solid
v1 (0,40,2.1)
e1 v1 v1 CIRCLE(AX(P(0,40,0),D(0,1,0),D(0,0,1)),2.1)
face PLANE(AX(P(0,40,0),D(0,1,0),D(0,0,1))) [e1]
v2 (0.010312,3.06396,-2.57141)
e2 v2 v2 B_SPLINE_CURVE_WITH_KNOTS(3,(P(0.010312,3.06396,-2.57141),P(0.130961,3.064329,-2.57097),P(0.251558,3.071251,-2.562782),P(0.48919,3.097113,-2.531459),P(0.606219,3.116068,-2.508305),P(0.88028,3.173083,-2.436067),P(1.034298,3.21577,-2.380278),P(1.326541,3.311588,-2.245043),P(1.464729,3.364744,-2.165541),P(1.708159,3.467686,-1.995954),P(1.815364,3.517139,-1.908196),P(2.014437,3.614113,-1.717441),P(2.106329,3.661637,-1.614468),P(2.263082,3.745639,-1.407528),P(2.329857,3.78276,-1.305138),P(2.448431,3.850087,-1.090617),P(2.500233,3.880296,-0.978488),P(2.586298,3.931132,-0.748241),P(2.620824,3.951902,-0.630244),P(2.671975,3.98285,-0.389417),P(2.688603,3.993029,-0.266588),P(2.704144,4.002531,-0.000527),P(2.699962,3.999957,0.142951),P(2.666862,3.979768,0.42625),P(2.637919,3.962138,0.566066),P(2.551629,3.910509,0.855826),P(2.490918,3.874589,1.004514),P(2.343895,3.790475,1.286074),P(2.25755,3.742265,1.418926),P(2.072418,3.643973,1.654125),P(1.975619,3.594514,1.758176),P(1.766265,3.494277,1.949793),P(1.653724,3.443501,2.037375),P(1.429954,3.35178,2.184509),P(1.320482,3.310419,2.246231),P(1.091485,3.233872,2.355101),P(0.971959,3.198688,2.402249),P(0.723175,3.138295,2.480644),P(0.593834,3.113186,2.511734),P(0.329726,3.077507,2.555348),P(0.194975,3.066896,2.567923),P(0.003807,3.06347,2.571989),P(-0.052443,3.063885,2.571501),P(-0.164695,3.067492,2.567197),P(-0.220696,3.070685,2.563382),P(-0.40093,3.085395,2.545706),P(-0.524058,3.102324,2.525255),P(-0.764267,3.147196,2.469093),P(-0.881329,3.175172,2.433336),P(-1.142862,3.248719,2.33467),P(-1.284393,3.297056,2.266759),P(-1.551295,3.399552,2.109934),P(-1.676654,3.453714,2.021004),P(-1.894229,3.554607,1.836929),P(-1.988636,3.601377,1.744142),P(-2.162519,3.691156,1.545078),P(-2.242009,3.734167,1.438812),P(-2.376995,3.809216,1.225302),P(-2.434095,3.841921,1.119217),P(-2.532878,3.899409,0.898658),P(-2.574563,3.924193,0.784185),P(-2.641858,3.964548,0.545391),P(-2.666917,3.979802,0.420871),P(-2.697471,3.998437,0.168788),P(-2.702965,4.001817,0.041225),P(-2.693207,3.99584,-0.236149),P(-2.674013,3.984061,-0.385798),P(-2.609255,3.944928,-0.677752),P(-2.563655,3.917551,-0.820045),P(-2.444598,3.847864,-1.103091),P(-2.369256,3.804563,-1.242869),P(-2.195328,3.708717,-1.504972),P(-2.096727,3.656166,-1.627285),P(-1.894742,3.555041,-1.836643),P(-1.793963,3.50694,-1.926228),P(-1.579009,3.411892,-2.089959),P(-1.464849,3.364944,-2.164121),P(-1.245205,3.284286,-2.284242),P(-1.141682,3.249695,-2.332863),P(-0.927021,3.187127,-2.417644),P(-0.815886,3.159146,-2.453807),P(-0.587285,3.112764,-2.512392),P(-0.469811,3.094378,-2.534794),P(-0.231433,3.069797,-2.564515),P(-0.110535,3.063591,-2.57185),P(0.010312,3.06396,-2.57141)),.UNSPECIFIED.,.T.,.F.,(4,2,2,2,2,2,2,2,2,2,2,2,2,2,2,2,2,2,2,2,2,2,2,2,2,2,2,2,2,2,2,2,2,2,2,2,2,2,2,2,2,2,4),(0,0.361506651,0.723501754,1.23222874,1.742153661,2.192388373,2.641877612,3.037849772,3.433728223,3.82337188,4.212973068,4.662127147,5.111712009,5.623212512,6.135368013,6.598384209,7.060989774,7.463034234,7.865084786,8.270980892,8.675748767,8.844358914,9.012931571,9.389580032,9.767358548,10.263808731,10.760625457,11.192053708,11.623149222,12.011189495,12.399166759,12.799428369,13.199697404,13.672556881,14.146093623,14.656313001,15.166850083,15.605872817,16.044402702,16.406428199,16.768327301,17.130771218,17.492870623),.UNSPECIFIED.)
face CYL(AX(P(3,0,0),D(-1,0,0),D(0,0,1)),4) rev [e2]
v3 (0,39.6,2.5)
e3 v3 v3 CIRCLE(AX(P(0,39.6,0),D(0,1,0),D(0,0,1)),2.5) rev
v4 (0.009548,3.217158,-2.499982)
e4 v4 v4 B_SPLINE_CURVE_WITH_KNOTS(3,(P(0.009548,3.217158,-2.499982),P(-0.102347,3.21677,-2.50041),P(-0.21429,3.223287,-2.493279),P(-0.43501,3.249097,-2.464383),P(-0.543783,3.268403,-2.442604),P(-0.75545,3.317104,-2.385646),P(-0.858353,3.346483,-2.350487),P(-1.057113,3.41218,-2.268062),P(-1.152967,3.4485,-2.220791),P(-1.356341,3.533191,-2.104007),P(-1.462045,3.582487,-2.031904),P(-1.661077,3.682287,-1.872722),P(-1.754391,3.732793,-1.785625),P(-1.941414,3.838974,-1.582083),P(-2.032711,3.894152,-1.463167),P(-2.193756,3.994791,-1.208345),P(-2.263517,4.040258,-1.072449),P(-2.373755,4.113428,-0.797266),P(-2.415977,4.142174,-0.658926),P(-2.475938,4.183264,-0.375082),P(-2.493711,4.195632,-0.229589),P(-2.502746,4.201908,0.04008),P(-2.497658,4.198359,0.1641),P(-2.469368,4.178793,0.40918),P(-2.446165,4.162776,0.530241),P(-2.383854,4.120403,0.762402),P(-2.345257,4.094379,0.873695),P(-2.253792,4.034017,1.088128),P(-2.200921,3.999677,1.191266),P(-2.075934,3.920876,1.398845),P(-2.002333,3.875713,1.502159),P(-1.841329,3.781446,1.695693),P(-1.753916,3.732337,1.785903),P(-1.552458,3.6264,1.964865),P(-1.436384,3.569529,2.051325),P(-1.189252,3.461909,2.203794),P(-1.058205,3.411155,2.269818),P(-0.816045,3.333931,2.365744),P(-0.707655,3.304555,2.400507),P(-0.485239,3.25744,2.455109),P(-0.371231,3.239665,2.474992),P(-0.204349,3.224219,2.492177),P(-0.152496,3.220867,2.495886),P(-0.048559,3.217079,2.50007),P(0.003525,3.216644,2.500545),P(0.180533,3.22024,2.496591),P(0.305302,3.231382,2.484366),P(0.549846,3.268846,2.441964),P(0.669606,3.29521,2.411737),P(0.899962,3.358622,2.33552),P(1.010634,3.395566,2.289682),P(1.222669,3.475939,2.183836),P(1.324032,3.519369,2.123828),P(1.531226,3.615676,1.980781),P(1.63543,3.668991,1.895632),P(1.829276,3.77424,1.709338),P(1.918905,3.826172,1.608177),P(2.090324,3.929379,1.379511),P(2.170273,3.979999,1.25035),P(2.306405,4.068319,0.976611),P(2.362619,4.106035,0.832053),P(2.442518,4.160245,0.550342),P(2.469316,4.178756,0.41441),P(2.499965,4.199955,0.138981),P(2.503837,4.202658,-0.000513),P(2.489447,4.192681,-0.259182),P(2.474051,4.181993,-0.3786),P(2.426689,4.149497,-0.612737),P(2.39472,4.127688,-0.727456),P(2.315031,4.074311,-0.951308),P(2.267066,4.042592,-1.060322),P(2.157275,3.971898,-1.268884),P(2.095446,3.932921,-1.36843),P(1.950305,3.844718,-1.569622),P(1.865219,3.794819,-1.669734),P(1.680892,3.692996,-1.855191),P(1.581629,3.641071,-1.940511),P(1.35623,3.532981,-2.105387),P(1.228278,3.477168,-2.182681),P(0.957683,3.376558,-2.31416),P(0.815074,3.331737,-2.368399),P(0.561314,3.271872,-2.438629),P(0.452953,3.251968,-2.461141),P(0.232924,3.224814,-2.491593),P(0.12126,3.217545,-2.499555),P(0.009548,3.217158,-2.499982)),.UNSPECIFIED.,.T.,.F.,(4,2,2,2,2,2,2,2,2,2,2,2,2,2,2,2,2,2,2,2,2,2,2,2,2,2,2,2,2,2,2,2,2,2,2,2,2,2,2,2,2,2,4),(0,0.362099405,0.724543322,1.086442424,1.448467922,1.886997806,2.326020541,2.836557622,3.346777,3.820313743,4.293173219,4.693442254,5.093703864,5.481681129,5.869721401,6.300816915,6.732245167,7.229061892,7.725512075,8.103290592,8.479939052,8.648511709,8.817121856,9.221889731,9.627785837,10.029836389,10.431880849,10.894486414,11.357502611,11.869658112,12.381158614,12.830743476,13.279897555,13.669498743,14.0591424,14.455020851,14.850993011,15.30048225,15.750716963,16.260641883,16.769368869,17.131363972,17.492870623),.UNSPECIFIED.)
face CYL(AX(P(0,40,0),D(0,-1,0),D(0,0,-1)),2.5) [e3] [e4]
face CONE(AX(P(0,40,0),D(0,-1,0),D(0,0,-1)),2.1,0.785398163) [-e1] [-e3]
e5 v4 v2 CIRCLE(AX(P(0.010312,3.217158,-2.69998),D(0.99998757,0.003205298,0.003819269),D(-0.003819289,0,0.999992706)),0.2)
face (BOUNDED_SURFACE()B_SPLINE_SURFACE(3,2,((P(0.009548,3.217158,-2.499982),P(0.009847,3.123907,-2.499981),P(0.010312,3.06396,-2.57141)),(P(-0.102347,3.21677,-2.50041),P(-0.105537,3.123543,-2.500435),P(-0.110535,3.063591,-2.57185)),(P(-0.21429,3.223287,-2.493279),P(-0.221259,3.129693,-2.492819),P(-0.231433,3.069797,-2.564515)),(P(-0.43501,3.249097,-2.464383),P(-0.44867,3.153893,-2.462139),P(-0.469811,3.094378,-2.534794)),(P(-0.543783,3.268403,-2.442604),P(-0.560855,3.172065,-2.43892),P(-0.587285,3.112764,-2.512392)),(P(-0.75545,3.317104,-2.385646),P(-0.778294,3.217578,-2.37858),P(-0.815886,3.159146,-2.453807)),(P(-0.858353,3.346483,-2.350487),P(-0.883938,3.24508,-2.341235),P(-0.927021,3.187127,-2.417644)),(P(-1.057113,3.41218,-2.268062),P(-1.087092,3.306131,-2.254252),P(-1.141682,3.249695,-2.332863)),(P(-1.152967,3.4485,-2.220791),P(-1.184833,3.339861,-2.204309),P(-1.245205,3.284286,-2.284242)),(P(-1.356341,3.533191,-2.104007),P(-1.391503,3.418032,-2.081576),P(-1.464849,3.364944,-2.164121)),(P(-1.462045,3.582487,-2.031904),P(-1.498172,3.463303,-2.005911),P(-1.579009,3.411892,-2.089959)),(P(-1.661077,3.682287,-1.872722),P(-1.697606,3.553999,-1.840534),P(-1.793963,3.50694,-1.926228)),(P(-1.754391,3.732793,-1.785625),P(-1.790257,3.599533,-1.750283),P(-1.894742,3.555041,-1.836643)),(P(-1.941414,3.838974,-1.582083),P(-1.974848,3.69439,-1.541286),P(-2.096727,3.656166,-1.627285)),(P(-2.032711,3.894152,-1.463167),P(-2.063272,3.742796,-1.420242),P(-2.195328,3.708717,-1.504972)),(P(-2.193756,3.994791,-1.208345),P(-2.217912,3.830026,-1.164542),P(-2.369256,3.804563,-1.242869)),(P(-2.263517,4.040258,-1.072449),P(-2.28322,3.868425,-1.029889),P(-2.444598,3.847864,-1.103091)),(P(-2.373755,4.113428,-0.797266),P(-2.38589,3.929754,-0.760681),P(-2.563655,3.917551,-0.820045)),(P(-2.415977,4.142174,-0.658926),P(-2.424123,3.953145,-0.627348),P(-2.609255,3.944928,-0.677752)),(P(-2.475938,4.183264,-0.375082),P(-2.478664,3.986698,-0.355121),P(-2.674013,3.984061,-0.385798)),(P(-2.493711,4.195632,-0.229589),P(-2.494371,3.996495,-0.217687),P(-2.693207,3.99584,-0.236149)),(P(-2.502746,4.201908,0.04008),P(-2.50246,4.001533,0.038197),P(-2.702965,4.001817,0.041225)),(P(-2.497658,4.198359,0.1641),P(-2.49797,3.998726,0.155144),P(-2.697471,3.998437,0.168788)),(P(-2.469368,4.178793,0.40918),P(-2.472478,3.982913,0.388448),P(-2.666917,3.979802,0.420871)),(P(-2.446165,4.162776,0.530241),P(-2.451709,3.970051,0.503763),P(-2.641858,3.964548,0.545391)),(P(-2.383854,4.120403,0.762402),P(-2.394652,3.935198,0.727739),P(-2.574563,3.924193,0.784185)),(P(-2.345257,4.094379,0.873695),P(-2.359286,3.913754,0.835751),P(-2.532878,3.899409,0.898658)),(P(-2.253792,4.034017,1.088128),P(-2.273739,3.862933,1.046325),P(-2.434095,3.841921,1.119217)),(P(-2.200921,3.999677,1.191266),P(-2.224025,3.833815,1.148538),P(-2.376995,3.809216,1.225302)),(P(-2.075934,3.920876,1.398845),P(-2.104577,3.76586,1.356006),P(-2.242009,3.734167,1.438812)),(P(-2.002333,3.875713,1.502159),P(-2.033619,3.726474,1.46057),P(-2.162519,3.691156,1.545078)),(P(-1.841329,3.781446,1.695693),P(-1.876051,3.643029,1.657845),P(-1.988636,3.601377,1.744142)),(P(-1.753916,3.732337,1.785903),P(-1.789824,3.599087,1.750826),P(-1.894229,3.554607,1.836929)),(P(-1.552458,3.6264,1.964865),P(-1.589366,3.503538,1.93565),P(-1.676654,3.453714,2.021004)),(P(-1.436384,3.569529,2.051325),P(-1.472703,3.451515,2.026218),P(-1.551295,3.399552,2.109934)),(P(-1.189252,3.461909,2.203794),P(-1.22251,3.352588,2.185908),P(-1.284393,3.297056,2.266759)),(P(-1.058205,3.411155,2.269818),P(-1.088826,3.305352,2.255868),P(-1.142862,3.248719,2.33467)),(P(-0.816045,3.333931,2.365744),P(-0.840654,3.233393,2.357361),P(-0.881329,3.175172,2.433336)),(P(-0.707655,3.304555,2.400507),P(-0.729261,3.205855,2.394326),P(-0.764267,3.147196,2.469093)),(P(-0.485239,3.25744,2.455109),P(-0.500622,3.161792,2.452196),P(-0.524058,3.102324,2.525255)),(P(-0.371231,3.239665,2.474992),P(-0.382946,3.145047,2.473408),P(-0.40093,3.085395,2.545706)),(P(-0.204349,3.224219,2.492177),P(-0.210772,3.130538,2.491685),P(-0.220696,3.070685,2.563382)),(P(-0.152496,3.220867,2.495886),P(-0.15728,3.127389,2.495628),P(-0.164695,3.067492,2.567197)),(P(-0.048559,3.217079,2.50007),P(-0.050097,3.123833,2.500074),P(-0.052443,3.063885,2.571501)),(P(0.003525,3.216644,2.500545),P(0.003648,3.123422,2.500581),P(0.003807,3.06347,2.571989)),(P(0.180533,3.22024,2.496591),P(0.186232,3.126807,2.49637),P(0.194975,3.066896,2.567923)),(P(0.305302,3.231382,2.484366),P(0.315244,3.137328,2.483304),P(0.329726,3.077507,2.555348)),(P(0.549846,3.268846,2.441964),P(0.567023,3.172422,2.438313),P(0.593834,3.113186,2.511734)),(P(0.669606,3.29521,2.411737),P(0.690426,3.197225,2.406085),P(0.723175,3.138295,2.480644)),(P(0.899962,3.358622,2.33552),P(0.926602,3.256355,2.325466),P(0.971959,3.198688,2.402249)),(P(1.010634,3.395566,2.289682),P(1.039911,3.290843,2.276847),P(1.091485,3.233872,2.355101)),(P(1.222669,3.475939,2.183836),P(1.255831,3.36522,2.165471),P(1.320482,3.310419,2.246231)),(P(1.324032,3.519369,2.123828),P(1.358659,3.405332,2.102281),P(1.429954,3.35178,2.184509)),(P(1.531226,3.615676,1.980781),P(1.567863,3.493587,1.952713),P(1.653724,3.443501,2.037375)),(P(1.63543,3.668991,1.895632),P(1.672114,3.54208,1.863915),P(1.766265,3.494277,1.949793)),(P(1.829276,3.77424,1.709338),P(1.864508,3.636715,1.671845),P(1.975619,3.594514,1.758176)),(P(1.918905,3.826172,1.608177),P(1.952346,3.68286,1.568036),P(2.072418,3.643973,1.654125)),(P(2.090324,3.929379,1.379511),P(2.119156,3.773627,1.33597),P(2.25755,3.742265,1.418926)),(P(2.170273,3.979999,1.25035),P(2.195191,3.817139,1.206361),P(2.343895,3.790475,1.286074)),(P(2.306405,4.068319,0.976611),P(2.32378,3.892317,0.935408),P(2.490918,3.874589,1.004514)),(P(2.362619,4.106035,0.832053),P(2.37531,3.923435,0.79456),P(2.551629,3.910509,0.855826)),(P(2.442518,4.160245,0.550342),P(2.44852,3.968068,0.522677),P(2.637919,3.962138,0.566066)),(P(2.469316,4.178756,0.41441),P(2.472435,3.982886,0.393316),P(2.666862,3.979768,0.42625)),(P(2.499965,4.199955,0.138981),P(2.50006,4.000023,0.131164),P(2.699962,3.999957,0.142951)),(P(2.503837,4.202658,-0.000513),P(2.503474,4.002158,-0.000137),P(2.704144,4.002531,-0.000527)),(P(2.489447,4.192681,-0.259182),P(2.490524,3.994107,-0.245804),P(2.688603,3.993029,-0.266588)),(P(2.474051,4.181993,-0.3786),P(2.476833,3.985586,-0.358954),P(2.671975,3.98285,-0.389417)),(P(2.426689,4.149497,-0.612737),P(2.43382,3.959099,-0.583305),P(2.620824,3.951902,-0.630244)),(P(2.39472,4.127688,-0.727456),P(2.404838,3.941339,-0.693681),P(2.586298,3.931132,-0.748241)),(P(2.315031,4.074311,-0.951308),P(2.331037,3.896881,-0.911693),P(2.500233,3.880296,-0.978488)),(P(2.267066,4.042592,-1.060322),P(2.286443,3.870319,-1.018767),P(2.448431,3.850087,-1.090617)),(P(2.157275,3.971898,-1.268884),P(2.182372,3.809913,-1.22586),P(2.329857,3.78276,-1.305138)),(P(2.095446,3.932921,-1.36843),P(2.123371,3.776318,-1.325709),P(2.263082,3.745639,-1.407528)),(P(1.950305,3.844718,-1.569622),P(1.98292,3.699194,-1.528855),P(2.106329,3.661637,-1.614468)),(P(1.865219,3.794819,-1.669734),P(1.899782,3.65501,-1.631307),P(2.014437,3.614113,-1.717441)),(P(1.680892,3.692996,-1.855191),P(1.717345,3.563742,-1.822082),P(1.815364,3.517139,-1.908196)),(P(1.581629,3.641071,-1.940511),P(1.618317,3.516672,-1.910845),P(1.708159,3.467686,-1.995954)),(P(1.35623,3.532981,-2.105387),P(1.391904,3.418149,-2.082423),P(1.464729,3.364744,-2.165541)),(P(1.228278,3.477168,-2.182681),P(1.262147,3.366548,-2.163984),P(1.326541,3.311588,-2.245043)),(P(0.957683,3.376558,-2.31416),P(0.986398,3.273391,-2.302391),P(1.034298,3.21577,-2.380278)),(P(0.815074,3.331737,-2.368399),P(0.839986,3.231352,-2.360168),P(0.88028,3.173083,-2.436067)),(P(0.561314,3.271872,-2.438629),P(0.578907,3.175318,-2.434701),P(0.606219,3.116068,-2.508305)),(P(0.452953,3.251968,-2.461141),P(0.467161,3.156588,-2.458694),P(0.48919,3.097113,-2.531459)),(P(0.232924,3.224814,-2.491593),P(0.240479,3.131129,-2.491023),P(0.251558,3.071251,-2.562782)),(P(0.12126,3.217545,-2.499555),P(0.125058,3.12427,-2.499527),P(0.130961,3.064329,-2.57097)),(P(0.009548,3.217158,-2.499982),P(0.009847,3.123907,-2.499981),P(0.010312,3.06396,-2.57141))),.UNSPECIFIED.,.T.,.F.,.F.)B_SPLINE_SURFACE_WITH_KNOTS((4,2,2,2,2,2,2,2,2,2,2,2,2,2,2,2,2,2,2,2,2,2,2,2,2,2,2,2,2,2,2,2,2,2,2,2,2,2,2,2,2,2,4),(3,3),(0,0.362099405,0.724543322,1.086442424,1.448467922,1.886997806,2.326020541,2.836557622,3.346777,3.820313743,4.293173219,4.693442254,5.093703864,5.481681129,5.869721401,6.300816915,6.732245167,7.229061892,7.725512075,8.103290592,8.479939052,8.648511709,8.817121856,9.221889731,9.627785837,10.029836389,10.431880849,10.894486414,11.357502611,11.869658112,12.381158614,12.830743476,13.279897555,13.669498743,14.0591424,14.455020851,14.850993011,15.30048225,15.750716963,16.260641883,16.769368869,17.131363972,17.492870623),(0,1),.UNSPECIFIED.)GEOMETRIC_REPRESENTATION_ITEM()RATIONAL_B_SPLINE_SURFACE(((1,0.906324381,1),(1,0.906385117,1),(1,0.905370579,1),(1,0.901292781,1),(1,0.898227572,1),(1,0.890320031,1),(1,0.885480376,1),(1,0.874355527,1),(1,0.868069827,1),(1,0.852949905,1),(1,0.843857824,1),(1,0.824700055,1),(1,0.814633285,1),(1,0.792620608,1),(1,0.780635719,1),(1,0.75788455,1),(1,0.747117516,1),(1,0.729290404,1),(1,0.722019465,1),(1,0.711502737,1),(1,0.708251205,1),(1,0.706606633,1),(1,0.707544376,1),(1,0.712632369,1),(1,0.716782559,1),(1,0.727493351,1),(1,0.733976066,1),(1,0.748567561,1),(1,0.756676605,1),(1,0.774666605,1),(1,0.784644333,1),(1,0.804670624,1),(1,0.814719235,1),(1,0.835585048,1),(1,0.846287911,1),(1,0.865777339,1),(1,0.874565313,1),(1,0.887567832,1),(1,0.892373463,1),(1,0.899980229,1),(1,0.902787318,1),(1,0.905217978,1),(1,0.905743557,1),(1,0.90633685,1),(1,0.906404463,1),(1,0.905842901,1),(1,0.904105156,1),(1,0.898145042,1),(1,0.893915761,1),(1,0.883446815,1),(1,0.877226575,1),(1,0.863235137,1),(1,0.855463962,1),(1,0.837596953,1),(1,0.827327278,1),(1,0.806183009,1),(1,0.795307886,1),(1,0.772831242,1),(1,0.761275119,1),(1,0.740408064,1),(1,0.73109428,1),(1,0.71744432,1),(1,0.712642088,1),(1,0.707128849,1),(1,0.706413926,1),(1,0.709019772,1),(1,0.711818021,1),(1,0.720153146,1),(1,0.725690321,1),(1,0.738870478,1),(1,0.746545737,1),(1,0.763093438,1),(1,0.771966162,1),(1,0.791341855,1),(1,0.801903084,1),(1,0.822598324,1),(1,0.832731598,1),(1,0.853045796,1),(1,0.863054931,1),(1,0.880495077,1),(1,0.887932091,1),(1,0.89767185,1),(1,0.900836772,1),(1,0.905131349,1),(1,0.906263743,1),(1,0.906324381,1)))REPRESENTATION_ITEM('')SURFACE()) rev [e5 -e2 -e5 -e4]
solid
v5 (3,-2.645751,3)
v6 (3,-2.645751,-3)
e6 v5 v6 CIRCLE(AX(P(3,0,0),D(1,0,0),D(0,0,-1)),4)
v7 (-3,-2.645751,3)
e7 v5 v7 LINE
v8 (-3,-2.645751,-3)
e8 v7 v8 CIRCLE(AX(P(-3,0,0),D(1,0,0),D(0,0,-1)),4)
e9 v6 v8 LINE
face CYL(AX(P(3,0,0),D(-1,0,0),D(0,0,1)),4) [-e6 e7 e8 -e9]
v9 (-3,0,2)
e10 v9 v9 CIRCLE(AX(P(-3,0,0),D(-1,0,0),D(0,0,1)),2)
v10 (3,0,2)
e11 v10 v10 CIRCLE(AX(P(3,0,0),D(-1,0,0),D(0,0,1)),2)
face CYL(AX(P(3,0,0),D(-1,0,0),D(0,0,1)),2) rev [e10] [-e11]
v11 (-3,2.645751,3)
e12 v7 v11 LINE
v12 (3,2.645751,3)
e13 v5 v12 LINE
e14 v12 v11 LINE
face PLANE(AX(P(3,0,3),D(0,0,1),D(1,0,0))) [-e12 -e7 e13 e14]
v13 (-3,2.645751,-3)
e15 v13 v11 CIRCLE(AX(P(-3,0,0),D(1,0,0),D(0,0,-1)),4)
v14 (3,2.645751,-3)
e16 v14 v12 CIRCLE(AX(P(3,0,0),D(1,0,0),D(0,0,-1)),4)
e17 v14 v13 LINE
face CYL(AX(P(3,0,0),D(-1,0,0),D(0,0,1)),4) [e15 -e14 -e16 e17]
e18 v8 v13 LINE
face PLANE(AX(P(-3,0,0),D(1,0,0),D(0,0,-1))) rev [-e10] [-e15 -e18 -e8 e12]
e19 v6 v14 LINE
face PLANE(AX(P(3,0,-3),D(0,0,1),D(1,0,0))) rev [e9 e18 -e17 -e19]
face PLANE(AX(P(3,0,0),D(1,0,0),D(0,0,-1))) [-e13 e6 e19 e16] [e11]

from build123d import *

# Parameters (mm, degrees)
SKETCH1_R           = 2.5
BOSS_EXTRUDE1_DEPTH = 40
SKETCH2_R           = 4
BOSS_EXTRUDE2_DEPTH = 3
CUT_EXTRUDE1_START  = -6
CUT_EXTRUDE1_DEPTH  = 6
SKETCH5_R           = 2
CUT_EXTRUDE2_DEPTH  = 41.558599702
FILLET1_R           = 0.2
CHAMFER1_SIZE       = 0.4
SPLIT1_START        = -3
SPLIT1_OUTLINE_R    = 2
SPLIT1_DEPTH        = 6
SPLIT1_2_OUTLINE_R  = 2
SPLIT1_2_DEPTH      = 6


# Read off the part's stored shape, not the designer's step: Split1
with BuildPart() as part:
    # Sketch1 → Boss-Extrude1 (new body)
    with BuildSketch(Plane(origin=(0, 0, 0), x_dir=(1, 0, 0), z_dir=(0, 1, 0))):
        with Locations(Location((0, 0, 0), (0, 0, 270))):
            Circle(SKETCH1_R)
    extrude(amount=BOSS_EXTRUDE1_DEPTH)

    # Sketch2 → Boss-Extrude2 (add, symmetric)
    with BuildSketch(Plane(origin=(0, 0, 0), x_dir=(0, 0, -1), z_dir=(1, 0, 0))):
        Circle(SKETCH2_R)
    extrude(amount=BOSS_EXTRUDE2_DEPTH, both=True)

    # Sketch3 → Cut-Extrude1 (cut)
    with BuildSketch(Plane.ZY.offset(3).offset(CUT_EXTRUDE1_START)):
        with BuildLine():
            ThreePointArc((-3, 2.645751311), (-4, 0), (-3, -2.645751311))
            Line((-3, -2.645751311), (-3, 2.645751311))
        make_face()
        with BuildLine():
            Line((3, 2.645751311), (3, -2.645751311))
            ThreePointArc((3, -2.645751311), (3.741657387, -1.414213562), (4, 0))
            ThreePointArc((4, 0), (3.741657387, 1.414213562), (3, 2.645751311))
        make_face()
    extrude(amount=CUT_EXTRUDE1_DEPTH, mode=Mode.SUBTRACT)

    # Sketch5 → Cut-Extrude2 (cut, through all)
    with BuildSketch(Plane.ZY.offset(3)):
        Circle(SKETCH5_R)
    extrude(amount=-CUT_EXTRUDE2_DEPTH, mode=Mode.SUBTRACT)

    # Fillet1
    fillet1_edges = [part.edges().sort_by_distance(p)[0] for p in [
        (0, 3.122498999, -2.5),
    ]]
    fillet(fillet1_edges, radius=FILLET1_R)

    # Chamfer1
    chamfer1_edges = [part.edges().sort_by_distance(p)[0] for p in [
        (0, 40, -2.5),
    ]]
    chamfer(chamfer1_edges, length=CHAMFER1_SIZE)

    # Split1 2 outline → Split1 2 (cut)
    with BuildSketch(Plane.YZ.offset(SPLIT1_START)):
        with BuildLine():
            ThreePointArc((3.063858732, -2.571530609), (3.999999989, 0.000302983), (3.063469131, 2.571994728))
            ThreePointArc((3.063469131, 2.571994728), (2.86262059, 2.793815197), (2.645751311, 3))
            Line((2.645751311, 3), (-2.645751311, 3))
            ThreePointArc((-2.645751311, 3), (-4, 0), (-2.645751311, -3))
            Line((-2.645751311, -3), (2.645751311, -3))
            ThreePointArc((2.645751311, -3), (2.862832202, -2.793598358), (3.063858732, -2.571530609))
        make_face()
        Circle(SPLIT1_2_OUTLINE_R, mode=Mode.SUBTRACT)
    extrude(amount=SPLIT1_2_DEPTH, mode=Mode.SUBTRACT)


with BuildPart() as body_2:
    # Split1 outline → Split1 (new body)
    with BuildSketch(Plane.YZ.offset(SPLIT1_START)):
        with BuildLine():
            ThreePointArc((2.645751311, -3), (4, 0), (2.645751311, 3))
            Line((2.645751311, 3), (-2.645751311, 3))
            ThreePointArc((-2.645751311, 3), (-4, 0), (-2.645751311, -3))
            Line((-2.645751311, -3), (2.645751311, -3))
        make_face()
        Circle(SPLIT1_OUTLINE_R, mode=Mode.SUBTRACT)
    extrude(amount=SPLIT1_DEPTH)


solid = Compound([part.part, body_2.part])
